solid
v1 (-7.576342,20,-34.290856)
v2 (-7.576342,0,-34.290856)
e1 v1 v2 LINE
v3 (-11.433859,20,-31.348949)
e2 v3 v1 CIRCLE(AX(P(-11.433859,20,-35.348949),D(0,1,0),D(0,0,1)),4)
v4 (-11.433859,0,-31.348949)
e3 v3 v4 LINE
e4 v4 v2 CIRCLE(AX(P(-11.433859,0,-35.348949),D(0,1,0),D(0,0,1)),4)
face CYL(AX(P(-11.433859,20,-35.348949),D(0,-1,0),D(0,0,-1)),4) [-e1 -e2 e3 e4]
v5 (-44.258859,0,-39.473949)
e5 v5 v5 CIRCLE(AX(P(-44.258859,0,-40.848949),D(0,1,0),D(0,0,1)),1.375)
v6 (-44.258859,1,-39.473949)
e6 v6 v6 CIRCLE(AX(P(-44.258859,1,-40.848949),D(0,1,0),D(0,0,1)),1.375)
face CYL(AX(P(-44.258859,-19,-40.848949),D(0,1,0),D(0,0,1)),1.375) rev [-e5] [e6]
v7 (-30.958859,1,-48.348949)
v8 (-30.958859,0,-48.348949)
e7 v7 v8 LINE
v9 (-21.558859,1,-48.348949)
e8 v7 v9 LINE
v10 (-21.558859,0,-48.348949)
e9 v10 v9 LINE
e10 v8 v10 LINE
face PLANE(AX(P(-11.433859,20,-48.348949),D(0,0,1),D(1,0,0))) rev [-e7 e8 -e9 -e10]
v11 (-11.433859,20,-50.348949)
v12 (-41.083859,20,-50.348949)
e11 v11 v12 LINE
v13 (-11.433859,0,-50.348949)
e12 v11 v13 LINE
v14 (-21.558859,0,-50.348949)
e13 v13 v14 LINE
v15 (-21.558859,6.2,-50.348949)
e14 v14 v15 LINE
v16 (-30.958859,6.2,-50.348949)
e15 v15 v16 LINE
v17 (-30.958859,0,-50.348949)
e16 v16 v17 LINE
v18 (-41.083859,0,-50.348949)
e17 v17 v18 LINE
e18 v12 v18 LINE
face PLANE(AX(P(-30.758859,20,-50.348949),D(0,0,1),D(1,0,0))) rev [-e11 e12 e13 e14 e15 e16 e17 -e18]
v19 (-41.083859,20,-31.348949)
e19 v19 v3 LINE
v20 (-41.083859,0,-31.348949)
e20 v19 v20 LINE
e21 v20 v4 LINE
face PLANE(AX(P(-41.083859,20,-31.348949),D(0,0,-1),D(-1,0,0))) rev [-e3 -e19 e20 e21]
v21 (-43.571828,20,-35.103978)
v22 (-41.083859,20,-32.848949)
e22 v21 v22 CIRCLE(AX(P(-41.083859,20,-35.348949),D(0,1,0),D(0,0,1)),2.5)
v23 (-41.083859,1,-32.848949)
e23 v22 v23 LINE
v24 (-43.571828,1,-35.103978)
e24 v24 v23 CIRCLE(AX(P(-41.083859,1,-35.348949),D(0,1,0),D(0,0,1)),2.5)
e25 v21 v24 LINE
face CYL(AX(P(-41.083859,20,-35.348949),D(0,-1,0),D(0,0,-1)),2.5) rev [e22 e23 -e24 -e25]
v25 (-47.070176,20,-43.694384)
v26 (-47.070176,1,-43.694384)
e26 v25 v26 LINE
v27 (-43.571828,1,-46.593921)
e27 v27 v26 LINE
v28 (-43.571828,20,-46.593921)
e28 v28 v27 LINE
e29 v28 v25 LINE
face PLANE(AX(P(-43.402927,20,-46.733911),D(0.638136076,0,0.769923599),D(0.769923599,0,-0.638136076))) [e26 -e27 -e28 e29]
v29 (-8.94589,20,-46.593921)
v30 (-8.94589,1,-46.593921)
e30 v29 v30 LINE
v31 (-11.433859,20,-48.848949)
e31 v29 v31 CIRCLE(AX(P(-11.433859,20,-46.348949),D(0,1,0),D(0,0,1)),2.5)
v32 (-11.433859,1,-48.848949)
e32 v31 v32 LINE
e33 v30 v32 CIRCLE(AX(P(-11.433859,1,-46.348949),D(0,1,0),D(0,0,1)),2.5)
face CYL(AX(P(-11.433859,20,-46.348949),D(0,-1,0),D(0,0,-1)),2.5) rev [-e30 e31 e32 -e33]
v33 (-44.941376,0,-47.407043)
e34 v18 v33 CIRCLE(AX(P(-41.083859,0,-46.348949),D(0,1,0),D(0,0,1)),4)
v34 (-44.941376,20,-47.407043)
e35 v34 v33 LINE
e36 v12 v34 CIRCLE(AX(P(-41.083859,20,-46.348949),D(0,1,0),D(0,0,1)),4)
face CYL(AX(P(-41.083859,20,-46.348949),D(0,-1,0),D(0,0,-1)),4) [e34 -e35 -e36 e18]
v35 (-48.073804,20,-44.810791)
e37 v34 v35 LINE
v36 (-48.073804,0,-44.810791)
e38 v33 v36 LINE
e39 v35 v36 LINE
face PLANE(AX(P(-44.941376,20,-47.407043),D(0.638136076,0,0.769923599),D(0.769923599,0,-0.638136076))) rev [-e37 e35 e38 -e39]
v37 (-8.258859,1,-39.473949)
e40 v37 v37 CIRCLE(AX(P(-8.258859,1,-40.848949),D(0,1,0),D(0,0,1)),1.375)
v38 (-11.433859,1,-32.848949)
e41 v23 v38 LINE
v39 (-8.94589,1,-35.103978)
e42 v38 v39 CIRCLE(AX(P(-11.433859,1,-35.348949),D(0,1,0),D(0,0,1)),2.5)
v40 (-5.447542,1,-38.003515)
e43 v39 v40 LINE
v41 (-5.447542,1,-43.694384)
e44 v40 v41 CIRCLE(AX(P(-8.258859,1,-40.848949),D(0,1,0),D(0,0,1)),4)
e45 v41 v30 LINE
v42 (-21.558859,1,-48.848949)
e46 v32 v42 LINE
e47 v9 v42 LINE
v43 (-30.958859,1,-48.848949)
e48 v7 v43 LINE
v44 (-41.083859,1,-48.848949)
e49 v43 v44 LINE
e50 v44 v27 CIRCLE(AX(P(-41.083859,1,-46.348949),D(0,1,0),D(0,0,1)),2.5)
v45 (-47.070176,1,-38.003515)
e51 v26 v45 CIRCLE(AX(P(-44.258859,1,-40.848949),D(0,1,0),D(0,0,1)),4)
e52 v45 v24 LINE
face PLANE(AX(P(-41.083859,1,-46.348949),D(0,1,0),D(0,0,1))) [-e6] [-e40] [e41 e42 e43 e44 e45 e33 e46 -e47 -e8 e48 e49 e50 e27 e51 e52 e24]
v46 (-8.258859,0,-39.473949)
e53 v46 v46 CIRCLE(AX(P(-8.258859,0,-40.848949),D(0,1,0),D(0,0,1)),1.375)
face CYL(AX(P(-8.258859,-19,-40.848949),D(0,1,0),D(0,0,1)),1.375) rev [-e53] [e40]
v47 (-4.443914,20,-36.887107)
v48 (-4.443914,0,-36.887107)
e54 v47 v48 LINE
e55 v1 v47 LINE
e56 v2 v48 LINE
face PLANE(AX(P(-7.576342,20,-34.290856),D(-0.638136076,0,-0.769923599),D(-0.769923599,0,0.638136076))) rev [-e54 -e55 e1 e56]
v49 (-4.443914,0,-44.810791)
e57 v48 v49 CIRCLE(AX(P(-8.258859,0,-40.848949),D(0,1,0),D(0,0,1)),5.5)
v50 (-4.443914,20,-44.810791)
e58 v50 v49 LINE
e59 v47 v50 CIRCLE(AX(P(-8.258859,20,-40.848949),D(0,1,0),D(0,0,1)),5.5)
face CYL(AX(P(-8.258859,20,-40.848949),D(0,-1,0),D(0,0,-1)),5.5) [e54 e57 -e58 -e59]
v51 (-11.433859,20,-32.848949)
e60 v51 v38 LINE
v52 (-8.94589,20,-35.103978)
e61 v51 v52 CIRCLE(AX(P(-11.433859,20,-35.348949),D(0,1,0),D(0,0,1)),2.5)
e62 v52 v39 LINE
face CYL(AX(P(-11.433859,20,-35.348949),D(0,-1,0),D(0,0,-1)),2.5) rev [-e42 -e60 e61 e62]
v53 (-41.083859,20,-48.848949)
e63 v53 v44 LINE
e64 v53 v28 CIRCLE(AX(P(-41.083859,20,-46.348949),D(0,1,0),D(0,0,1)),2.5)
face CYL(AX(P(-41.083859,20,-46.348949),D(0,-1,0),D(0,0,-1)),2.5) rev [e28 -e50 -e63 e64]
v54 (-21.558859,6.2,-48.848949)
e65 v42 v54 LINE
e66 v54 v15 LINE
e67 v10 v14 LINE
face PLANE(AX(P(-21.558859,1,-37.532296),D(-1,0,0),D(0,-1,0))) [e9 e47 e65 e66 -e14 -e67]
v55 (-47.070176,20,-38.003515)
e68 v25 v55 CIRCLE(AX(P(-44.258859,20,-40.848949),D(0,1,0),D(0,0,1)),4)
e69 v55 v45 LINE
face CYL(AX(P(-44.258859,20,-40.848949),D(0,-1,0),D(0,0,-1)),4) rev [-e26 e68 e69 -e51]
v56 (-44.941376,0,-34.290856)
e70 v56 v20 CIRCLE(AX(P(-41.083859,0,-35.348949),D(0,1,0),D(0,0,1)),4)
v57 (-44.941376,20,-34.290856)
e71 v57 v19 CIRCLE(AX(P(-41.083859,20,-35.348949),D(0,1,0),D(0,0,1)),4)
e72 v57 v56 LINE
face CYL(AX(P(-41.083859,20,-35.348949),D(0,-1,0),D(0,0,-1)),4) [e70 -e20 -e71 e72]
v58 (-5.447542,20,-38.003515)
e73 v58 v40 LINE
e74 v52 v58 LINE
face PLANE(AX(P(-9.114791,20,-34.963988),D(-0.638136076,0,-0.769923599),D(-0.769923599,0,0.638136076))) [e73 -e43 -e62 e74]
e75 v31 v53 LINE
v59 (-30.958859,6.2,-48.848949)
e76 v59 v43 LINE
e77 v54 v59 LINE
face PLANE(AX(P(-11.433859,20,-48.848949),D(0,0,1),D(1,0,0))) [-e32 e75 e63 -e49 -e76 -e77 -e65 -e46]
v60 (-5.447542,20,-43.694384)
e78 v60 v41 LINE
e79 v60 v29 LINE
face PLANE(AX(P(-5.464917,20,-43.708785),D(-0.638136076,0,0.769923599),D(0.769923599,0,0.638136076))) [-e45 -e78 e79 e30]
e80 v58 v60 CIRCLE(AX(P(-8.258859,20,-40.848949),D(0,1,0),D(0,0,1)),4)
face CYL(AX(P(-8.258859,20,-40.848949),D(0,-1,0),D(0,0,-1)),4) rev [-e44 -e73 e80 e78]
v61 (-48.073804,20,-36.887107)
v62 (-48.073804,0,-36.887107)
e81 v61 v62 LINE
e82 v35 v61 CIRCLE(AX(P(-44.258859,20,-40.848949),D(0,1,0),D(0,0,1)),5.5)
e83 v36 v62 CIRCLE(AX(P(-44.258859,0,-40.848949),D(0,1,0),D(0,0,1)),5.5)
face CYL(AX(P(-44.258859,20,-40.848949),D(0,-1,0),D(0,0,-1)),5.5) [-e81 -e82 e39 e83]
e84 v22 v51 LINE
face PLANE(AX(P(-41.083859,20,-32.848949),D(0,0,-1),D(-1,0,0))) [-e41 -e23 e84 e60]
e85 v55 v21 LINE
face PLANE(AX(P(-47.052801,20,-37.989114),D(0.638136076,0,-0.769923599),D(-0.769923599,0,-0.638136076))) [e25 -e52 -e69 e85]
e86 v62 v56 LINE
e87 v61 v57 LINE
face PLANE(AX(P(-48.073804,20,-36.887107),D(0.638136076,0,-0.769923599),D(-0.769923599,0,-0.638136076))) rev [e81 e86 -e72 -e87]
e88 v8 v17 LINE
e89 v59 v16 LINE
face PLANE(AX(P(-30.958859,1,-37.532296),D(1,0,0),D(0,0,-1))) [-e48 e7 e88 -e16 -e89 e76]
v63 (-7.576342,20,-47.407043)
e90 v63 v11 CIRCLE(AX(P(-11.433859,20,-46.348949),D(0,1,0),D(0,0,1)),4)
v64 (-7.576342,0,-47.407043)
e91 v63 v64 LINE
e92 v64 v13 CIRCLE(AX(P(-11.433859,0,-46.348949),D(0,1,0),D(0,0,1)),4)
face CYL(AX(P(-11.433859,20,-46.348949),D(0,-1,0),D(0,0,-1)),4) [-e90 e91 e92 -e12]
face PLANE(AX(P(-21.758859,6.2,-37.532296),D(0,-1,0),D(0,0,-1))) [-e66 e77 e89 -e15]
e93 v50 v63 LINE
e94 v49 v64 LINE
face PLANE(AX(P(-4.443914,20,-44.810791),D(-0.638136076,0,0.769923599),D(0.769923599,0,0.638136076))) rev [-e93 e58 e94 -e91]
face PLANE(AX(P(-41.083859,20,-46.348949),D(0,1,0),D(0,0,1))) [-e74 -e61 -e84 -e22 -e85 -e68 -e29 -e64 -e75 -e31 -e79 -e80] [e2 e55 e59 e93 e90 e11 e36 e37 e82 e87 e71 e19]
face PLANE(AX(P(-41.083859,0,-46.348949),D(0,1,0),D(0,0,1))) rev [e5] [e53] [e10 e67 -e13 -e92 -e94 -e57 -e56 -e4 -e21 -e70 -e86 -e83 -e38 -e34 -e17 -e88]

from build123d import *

# Parameters (mm, degrees)
BOSS_EXTRUDE1_DEPTH = 1
BOSS_EXTRUDE2_DEPTH = 20
CUT_EXTRUDE1_DEPTH  = 2
SKETCH3_R           = 1.175
CUT_EXTRUDE2_DEPTH  = 20
MOVE_FACE1_BY       = 0.2
MOVE_FACE1_2_BY     = 0.2
MOVE_FACE1_3_BY     = 0.2
MOVE_FACE1_4_BY     = 0.2
MOVE_FACE1_5_BY     = 0.2
MOVE_START          = 1
MOVE_FACE2_DEPTH    = 19


# Read off the part's stored shape, not the designer's step: Move Face2
with BuildPart() as part:
    # Sketch1 → Boss-Extrude1 (new body)
    with BuildSketch(Plane(origin=(0, 0, 0), x_dir=(1, 0, 0), z_dir=(0, 1, 0))):
        with BuildLine():
            Line((-11.433858941, 48.348949441), (-21.758858941, 48.348949441))
            Line((-21.758858941, 48.348949441), (-30.758858941, 48.348949441))
            Line((-30.758858941, 48.348949441), (-41.083858941, 48.348949441))
            ThreePointArc((-41.083858941, 48.348949441), (-42.498072504, 47.763163004), (-43.083858941, 46.348949441))
            Line((-43.083858941, 46.348949441), (-46.733732675, 43.323823175))
            ThreePointArc((-46.733732675, 43.323823175), (-47.758858941, 40.848949441), (-46.733732675, 38.374075707))
            Line((-46.733732675, 38.374075707), (-43.083858941, 35.348949441))
            ThreePointArc((-43.083858941, 35.348949441), (-42.498072504, 33.934735879), (-41.083858941, 33.348949441))
            Line((-41.083858941, 33.348949441), (-11.433858941, 33.348949441))
            ThreePointArc((-11.433858941, 33.348949441), (-10.019645379, 33.934735879), (-9.433858941, 35.348949441))
            Line((-9.433858941, 35.348949441), (-5.783985207, 38.374075707))
            ThreePointArc((-5.783985207, 38.374075707), (-4.758858941, 40.848949441), (-5.783985207, 43.323823175))
            Line((-5.783985207, 43.323823175), (-9.433858941, 46.348949441))
            ThreePointArc((-9.433858941, 46.348949441), (-10.019645379, 47.763163004), (-11.433858941, 48.348949441))
        make_face()
    extrude(amount=BOSS_EXTRUDE1_DEPTH)

    # Sketch1<3> → Boss-Extrude2 (add)
    with BuildSketch(Plane(origin=(0, 0, 0), x_dir=(1, 0, 0), z_dir=(0, 1, 0))):
        with BuildLine():
            Line((-21.758858941, 50.348949441), (-30.758858941, 50.348949441))
            Line((-30.758858941, 50.348949441), (-41.083858941, 50.348949441))
            ThreePointArc((-41.083858941, 50.348949441), (-43.509516051, 49.529544917), (-44.941375957, 47.407043233))
            Line((-44.941375957, 47.407043233), (-48.073804253, 44.810791471))
            ThreePointArc((-48.073804253, 44.810791471), (-49.758858941, 40.848949441), (-48.073804253, 36.887107411))
            Line((-48.073804253, 36.887107411), (-44.941375957, 34.290855649))
            ThreePointArc((-44.941375957, 34.290855649), (-43.509516051, 32.168353965), (-41.083858941, 31.348949441))
            Line((-41.083858941, 31.348949441), (-11.433858941, 31.348949441))
            ThreePointArc((-11.433858941, 31.348949441), (-9.008201831, 32.168353965), (-7.576341925, 34.290855649))
            Line((-7.576341925, 34.290855649), (-4.443913629, 36.887107411))
            ThreePointArc((-4.443913629, 36.887107411), (-2.758858941, 40.848949441), (-4.443913629, 44.810791471))
            Line((-4.443913629, 44.810791471), (-7.576341925, 47.407043233))
            ThreePointArc((-7.576341925, 47.407043233), (-9.008201831, 49.529544917), (-11.433858941, 50.348949441))
            Line((-11.433858941, 50.348949441), (-21.758858941, 50.348949441))
        make_face()
        with BuildLine():
            Line((-11.433858941, 48.348949441), (-21.758858941, 48.348949441))
            Line((-21.758858941, 48.348949441), (-30.758858941, 48.348949441))
            Line((-30.758858941, 48.348949441), (-41.083858941, 48.348949441))
            ThreePointArc((-41.083858941, 48.348949441), (-42.498072504, 47.763163004), (-43.083858941, 46.348949441))
            Line((-43.083858941, 46.348949441), (-46.733732675, 43.323823175))
            ThreePointArc((-46.733732675, 43.323823175), (-47.758858941, 40.848949441), (-46.733732675, 38.374075707))
            Line((-46.733732675, 38.374075707), (-43.083858941, 35.348949441))
            ThreePointArc((-43.083858941, 35.348949441), (-42.498072504, 33.934735879), (-41.083858941, 33.348949441))
            Line((-41.083858941, 33.348949441), (-11.433858941, 33.348949441))
            ThreePointArc((-11.433858941, 33.348949441), (-10.019645379, 33.934735879), (-9.433858941, 35.348949441))
            Line((-9.433858941, 35.348949441), (-5.783985207, 38.374075707))
            ThreePointArc((-5.783985207, 38.374075707), (-4.758858941, 40.848949441), (-5.783985207, 43.323823175))
            Line((-5.783985207, 43.323823175), (-9.433858941, 46.348949441))
            ThreePointArc((-9.433858941, 46.348949441), (-10.019645379, 47.763163004), (-11.433858941, 48.348949441))
        make_face(mode=Mode.SUBTRACT)
    extrude(amount=BOSS_EXTRUDE2_DEPTH)

    # Sketch2 → Cut-Extrude1 (cut)
    with BuildSketch(Plane.XY.offset(-50.348949441)):
        Polygon((-21.758858941, 1), (-21.758858941, 6), (-30.758858941, 6), (-30.758858941, 1), (-30.758858941, 0), (-21.758858941, 0), align=None)
    extrude(amount=CUT_EXTRUDE1_DEPTH, mode=Mode.SUBTRACT)

    # Sketch3 → Cut-Extrude2 (cut)
    with BuildSketch(Plane(origin=(0, 1, 0), x_dir=(1, 0, 0), z_dir=(0, 1, 0))):
        with Locations(Location((-8.258858941, 40.848949441, 0), (0, 0, 270))):
            Circle(SKETCH3_R)
        with Locations(Location((-44.258858941, 40.848949441, 0), (0, 0, 270))):
            Circle(SKETCH3_R)
    extrude(amount=-CUT_EXTRUDE2_DEPTH, mode=Mode.SUBTRACT)

    # Move Face1: a face moved inward by 0.2
    extrude(part.faces().sort_by_distance((-26.258858941, 6, -49.348949441))[0], amount=MOVE_FACE1_BY, dir=(0, 1, 0), mode=Mode.SUBTRACT)

    # Move Face1 2: a face moved inward by 0.2
    extrude(part.faces().sort_by_distance((-30.758858941, 3, -49.348949441))[0], amount=MOVE_FACE1_2_BY, dir=(-1, 0, 0), mode=Mode.SUBTRACT)

    # Move Face1 3: a face moved inward by 0.2
    extrude(part.faces().sort_by_distance((-21.758858941, 3, -49.348949441))[0], amount=MOVE_FACE1_3_BY, dir=(1, 0, 0), mode=Mode.SUBTRACT)

    # Move Face1 4: a curved face moved inward by 0.2
    add(Solid.thicken(part.faces().sort_by_distance((-44.258858941, 0.5, -42.023949441))[0], -MOVE_FACE1_4_BY), mode=Mode.SUBTRACT)

    # Move Face1 5: a curved face moved inward by 0.2
    add(Solid.thicken(part.faces().sort_by_distance((-8.258858941, 0.5, -42.023949441))[0], -MOVE_FACE1_5_BY), mode=Mode.SUBTRACT)

    # Move Face2 outline → Move Face2 (cut)
    with BuildSketch(Plane(origin=(0, 0, 0), x_dir=(1, 0, 0), z_dir=(0, 1, 0)).offset(MOVE_START)):
        with BuildLine():
            ThreePointArc((-41.083858941, 48.848949441), (-42.762782817, 48.201303246), (-43.571827765, 46.593921137))
            Line((-43.571827765, 46.593921137), (-47.070175615, 43.694384128))
            ThreePointArc((-47.070175615, 43.694384128), (-48.258858941, 40.848949441), (-47.070175615, 38.003514754))
            Line((-47.070175615, 38.003514754), (-43.571827765, 35.103977746))
            ThreePointArc((-43.571827765, 35.103977746), (-42.762782817, 33.496595636), (-41.083858941, 32.848949441))
            Line((-41.083858941, 32.848949441), (-11.433858941, 32.848949441))
            ThreePointArc((-11.433858941, 32.848949441), (-9.754935065, 33.496595636), (-8.945890117, 35.103977746))
            Line((-8.945890117, 35.103977746), (-5.447542267, 38.003514754))
            ThreePointArc((-5.447542267, 38.003514754), (-4.258858941, 40.848949441), (-5.447542267, 43.694384128))
            Line((-5.447542267, 43.694384128), (-8.945890117, 46.593921137))
            ThreePointArc((-8.945890117, 46.593921137), (-9.754935065, 48.201303246), (-11.433858941, 48.848949441))
            Line((-11.433858941, 48.848949441), (-41.083858941, 48.848949441))
        make_face()
        with BuildLine():
            Line((-41.083858941, 48.348949441), (-11.433858941, 48.348949441))
            ThreePointArc((-11.433858941, 48.348949441), (-10.019645379, 47.763163004), (-9.433858941, 46.348949441))
            Line((-9.433858941, 46.348949441), (-5.783985207, 43.323823175))
            ThreePointArc((-5.783985207, 43.323823175), (-4.758858941, 40.848949441), (-5.783985207, 38.374075707))
            Line((-5.783985207, 38.374075707), (-9.433858941, 35.348949441))
            ThreePointArc((-9.433858941, 35.348949441), (-10.019645379, 33.934735879), (-11.433858941, 33.348949441))
            Line((-11.433858941, 33.348949441), (-41.083858941, 33.348949441))
            ThreePointArc((-41.083858941, 33.348949441), (-42.498072504, 33.934735879), (-43.083858941, 35.348949441))
            Line((-43.083858941, 35.348949441), (-46.733732675, 38.374075707))
            ThreePointArc((-46.733732675, 38.374075707), (-47.758858941, 40.848949441), (-46.733732675, 43.323823175))
            Line((-46.733732675, 43.323823175), (-43.083858941, 46.348949441))
            ThreePointArc((-43.083858941, 46.348949441), (-42.498072504, 47.763163004), (-41.083858941, 48.348949441))
        make_face(mode=Mode.SUBTRACT)
    extrude(amount=MOVE_FACE2_DEPTH, mode=Mode.SUBTRACT)


solid = part.part
